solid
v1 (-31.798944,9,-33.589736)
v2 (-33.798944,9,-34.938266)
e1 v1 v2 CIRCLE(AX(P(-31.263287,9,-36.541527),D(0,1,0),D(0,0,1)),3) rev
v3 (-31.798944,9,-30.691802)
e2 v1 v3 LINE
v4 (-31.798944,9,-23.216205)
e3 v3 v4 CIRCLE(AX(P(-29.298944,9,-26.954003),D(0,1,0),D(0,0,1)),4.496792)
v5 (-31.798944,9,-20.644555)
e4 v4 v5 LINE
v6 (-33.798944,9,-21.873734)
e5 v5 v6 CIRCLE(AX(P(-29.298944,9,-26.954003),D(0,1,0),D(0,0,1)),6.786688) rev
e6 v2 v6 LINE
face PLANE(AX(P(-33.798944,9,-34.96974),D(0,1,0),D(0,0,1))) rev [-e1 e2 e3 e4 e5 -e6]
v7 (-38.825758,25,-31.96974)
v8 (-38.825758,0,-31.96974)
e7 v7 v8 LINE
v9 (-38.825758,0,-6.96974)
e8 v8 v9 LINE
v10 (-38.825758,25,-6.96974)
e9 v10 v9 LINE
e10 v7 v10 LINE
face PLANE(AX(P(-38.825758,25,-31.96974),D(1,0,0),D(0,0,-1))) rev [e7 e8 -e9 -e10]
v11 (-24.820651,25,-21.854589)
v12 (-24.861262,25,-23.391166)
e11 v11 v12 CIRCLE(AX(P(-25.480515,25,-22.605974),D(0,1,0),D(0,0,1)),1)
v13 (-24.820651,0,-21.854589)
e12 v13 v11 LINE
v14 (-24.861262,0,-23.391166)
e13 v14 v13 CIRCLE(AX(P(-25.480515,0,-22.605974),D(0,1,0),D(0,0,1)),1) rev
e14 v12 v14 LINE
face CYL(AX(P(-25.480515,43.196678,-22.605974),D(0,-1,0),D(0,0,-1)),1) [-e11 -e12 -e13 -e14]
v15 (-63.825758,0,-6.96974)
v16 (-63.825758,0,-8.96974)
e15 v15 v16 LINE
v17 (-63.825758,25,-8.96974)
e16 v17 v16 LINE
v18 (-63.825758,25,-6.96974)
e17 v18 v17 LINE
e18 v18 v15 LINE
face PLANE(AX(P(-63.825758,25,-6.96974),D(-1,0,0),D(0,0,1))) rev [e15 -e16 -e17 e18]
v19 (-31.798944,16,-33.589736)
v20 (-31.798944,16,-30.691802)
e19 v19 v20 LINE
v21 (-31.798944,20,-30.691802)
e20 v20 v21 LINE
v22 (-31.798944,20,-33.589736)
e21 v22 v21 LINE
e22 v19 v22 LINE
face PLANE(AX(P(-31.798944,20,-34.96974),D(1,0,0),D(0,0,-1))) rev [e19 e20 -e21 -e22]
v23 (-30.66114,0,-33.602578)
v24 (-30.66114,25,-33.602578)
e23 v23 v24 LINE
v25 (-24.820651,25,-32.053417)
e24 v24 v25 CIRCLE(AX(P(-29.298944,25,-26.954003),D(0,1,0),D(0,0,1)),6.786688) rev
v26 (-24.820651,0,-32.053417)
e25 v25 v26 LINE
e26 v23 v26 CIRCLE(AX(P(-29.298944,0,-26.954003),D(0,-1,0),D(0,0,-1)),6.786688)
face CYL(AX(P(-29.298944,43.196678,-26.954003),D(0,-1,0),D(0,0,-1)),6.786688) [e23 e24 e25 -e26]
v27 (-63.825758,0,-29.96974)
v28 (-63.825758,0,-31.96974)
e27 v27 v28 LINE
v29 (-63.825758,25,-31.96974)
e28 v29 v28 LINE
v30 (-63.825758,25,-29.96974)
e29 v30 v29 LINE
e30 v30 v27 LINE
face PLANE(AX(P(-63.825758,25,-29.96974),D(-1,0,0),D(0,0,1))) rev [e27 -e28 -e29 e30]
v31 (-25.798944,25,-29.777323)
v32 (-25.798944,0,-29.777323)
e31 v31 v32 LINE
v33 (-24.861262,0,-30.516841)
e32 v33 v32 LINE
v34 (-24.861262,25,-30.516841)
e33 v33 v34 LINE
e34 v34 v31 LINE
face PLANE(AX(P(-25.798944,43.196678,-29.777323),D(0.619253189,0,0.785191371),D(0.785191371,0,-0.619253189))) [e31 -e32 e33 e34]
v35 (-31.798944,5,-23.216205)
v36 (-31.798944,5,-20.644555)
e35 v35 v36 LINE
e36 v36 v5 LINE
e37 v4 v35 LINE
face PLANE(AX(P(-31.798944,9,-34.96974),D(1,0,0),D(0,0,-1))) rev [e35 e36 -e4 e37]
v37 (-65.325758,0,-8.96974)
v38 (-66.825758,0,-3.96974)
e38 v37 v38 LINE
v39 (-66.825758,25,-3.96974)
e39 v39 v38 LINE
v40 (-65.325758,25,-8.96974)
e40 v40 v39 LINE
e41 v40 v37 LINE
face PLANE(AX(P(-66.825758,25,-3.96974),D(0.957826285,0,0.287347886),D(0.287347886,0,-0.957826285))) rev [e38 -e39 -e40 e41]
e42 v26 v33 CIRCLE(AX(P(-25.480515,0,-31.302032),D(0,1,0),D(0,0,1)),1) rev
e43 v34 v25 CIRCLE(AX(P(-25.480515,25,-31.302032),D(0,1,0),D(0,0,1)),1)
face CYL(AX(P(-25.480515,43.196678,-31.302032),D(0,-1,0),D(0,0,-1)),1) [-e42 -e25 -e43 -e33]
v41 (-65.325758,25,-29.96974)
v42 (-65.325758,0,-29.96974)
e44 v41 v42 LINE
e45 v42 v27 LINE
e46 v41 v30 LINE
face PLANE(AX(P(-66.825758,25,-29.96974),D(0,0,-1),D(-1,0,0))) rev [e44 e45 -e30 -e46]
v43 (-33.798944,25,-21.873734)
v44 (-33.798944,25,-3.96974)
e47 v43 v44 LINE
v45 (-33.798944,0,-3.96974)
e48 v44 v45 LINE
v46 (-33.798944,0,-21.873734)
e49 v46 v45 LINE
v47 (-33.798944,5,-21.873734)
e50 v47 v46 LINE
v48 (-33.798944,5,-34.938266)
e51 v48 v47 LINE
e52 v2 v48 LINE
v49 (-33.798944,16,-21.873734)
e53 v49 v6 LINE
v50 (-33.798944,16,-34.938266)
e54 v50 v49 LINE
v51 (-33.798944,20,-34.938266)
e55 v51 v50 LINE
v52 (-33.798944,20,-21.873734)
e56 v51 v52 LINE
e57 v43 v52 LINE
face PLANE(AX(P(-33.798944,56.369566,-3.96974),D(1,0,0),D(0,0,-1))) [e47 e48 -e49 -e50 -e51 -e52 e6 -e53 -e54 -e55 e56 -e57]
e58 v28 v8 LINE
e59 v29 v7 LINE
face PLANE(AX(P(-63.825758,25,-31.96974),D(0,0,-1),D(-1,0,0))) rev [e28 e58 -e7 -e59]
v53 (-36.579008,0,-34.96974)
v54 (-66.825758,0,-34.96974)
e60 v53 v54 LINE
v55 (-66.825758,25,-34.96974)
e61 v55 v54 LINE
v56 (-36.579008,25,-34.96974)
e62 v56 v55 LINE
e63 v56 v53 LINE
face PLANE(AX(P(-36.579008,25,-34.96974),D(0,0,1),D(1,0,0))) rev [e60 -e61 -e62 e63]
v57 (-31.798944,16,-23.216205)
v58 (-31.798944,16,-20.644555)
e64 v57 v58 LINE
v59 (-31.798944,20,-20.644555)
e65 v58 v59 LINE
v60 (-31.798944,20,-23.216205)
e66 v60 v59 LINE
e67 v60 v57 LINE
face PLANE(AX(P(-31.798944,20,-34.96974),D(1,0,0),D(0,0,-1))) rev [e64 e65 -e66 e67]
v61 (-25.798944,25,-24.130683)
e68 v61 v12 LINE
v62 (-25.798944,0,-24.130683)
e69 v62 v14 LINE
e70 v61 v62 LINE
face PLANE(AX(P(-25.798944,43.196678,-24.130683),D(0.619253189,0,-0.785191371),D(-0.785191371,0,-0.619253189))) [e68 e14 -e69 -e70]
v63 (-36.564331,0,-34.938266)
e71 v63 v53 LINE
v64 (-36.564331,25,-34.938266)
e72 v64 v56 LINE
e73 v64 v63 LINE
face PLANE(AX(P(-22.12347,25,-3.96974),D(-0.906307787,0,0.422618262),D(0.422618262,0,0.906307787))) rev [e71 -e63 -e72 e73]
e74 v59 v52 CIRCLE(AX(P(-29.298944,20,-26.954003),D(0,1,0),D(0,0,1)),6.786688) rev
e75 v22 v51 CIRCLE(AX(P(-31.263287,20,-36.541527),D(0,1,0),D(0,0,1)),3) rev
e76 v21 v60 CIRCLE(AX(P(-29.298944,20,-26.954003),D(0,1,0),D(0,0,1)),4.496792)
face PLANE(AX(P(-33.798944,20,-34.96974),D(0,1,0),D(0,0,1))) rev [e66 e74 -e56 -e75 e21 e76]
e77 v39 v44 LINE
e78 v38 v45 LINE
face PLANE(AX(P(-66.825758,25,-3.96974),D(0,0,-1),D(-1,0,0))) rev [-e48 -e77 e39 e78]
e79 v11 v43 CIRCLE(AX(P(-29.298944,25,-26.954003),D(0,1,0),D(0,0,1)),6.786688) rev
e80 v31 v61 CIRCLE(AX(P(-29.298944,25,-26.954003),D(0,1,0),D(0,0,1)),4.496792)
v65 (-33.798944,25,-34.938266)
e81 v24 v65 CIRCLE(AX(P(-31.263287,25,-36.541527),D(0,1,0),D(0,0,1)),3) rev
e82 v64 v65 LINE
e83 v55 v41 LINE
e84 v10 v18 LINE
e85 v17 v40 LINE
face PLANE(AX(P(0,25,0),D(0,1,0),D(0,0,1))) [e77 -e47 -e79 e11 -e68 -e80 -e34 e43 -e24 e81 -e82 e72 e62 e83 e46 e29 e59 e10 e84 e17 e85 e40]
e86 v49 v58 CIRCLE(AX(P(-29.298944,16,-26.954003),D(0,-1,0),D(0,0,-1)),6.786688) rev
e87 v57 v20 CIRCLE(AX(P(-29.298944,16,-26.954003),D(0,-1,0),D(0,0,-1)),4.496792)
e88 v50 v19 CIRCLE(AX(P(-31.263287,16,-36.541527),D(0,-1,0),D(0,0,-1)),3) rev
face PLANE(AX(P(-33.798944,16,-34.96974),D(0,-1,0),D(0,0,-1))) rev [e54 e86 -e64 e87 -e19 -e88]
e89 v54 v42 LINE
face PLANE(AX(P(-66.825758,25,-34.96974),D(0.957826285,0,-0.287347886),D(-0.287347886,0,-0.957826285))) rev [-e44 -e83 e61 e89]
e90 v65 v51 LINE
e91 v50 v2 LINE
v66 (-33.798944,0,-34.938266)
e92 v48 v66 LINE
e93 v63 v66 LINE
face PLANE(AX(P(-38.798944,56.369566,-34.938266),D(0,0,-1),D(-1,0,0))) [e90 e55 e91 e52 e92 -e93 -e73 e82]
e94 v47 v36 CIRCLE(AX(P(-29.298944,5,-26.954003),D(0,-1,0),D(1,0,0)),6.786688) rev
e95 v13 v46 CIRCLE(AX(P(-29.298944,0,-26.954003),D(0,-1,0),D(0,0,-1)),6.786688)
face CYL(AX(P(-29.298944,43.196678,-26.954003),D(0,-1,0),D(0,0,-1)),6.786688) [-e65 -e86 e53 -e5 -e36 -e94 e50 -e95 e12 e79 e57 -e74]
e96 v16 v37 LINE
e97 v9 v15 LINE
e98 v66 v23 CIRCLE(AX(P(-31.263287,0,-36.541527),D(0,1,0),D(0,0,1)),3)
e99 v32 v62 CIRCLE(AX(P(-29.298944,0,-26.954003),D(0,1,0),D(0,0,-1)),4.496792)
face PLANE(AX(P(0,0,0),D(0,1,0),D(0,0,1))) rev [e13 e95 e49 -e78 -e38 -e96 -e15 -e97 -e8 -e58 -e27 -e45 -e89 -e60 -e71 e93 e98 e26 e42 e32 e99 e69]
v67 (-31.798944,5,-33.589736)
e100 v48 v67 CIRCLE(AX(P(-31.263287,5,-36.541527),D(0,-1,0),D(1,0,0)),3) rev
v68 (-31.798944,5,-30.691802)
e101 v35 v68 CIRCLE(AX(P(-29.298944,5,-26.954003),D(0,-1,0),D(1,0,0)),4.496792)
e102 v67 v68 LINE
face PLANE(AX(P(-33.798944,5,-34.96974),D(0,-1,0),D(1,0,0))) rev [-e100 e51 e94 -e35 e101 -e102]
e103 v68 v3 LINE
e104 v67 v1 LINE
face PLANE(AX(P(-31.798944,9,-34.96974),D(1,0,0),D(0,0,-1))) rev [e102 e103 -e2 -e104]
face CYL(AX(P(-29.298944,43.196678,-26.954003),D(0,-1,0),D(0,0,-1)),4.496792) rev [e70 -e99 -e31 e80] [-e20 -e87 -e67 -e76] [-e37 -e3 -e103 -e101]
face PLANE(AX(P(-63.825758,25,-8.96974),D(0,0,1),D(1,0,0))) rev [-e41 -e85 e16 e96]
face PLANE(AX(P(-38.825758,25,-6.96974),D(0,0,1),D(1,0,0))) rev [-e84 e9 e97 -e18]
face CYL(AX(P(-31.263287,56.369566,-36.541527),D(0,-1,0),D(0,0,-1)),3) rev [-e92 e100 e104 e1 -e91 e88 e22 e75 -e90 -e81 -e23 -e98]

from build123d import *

# Parameters (mm, degrees)
EXTRUDE_1_DEPTH      = 25
CUT_EXTRUDE_4_DEPTH  = 80.457942189
SKETCH_7_W           = 16.60831278
SKETCH_7_H           = 38.473598513
CUT_EXTRUDE_14_DEPTH = 80.457942189
SKETCH_8_W           = 5
SKETCH_8_H           = 30.968526609
EXTRUDE_2_DEPTH      = 25
EXTRUDE_3_DEPTH      = 25
FILLET_2_R           = 3
FILLET_4_R           = 1
SKETCH_10_W          = 2
SKETCH_10_H          = 4
CUT_EXTRUDE_15_DEPTH = 78.792556685
SKETCH_11_W          = 10.357145721
SKETCH_11_H          = 16.019748685
CUT_EXTRUDE_16_DEPTH = 80.457942189


with BuildPart() as part:
    # Эскиз1 → Бобышка-Вытянуть1 (new body)
    with BuildSketch(Plane(origin=(0, 0, 0), x_dir=(1, 0, 0), z_dir=(0, 1, 0))):
        Polygon((-66.825757576, 34.969739794), (-66.825757576, 29.969739794), (-63.825757576, 29.969739794), (-63.825757576, 31.969739794), (-38.825757576, 31.969739794), (-38.825757576, 6.969739794), (-63.825757576, 6.969739794), (-63.825757576, 8.969739794), (-66.825757576, 8.969739794), (-66.825757576, 3.969739794), (-22.123470102, 3.969739794), (-36.579007505, 34.969739794), align=None)
    extrude(amount=EXTRUDE_1_DEPTH)

    # Эскиз3 → Вырез-Вытянуть4 (cut, through all)
    with BuildSketch(Plane.XZ):
        Polygon((-66.825757576, -3.969739794), (-65.325757576, -8.969739794), (-66.825757576, -8.969739794), align=None)
        Polygon((-66.825757576, -29.969739794), (-66.825757576, -34.969739794), (-65.325757576, -29.969739794), align=None)
    extrude(amount=-CUT_EXTRUDE_4_DEPTH, mode=Mode.SUBTRACT)

    # Эскиз7 → Вырез-Вытянуть14 (cut, through all)
    with BuildSketch(Plane(origin=(0, 0, 0), x_dir=(-1, 0, 0), z_dir=(0, -1, 0))):
        with Locations((27.703474463, 20.539743139)):
            Rectangle(SKETCH_7_W, SKETCH_7_H)
    extrude(amount=-CUT_EXTRUDE_14_DEPTH, mode=Mode.SUBTRACT)

    # Эскиз8 → Бобышка-Вытянуть2 (add)
    with BuildSketch(Plane(origin=(0, 0, 0), x_dir=(-1, 0, 0), z_dir=(0, -1, 0))):
        with Locations((36.298943925, 19.454003098)):
            Rectangle(SKETCH_8_W, SKETCH_8_H)
    extrude(amount=-EXTRUDE_2_DEPTH)

    # Эскиз9 → Бобышка-Вытянуть3 (add)
    with BuildSketch(Plane.XZ):
        with BuildLine():
            Line((-25.798943925, -9.121669553), (-24.000865345, -7.695483003))
            ThreePointArc((-24.000865345, -7.695483003), (-36.096342696, -11.954003099), (-24.000865345, -16.212523195))
            Line((-24.000865345, -16.212523195), (-25.798943925, -14.786336644))
            ThreePointArc((-25.798943925, -14.786336644), (-33.80140029, -11.954003099), (-25.798943925, -9.121669553))
        make_face()
        with BuildLine():
            Line((-25.798943925, -24.130682885), (-24.000865345, -22.7126007))
            ThreePointArc((-24.000865345, -22.7126007), (-36.0856317, -26.954003099), (-24.000865345, -31.195405497))
            Line((-24.000865345, -31.195405497), (-25.798943925, -29.777323313))
            ThreePointArc((-25.798943925, -29.777323313), (-33.795735785, -26.954003099), (-25.798943925, -24.130682885))
        make_face()
    extrude(amount=-EXTRUDE_3_DEPTH)

    # Скругление2
    # the kernel refuses this fillet: 3 mm, written as the material it adds along each edge
    with BuildSketch(Plane(origin=(-33.798943925, 25, -6.859434417), x_dir=(0, 0, 1), z_dir=(0, -1, 0))) as fillet_2_piece_1:
        with BuildLine():
            CenterArc((4.502629254, -2.529514158), FILLET_2_R, 122.523458888, 69.079199353)
            Line((1.563931496, -3.132884263), (1.505157541, -3.144951665))
            ThreePointArc((1.505157541, -3.144951665), (0.933475042, -1.490808901), (-0.044969279, -0.039721077))
            Line((-0.044969279, -0.039721077), (0, 0.06))
            ThreePointArc((0, 0.06), (1.444847312, 0.06), (2.85743593, 0.050590283))
            Line((2.85743593, 0.050590283), (2.889694623, 0))
        make_face()
    extrude(amount=25)
    with BuildSketch(Plane(origin=(-33.798943925, 25, -32.034271886), x_dir=(0, 0, -1), z_dir=(0, -1, 0))) as fillet_2_piece_2:
        with BuildLine():
            CenterArc((4.507255062, 2.535656843), FILLET_2_R, 168.421178081, 69.274223823)
            Line((1.568306542, 3.137804332), (1.509527572, 3.149847282))
            ThreePointArc((1.509527572, 3.149847282), (0.936720457, 1.492647534), (-0.044913828, 0.039783766))
            Line((-0.044913828, 0.039783766), (0, -0.06))
            ThreePointArc((0, -0.06), (1.451997259, -0.06), (2.871929307, -0.050713137))
            Line((2.871929307, -0.050713137), (2.903994517, 0))
        make_face()
    extrude(amount=25)

    # Скругление4
    fillet_4_edges = [part.edges().sort_by_distance(p)[0] for p in [
        (-24.000865345, 12.5, -7.695483003),
        (-24.000865345, 12.5, -16.212523195),
        (-24.000865345, 12.5, -22.7126007),
        (-24.000865345, 12.5, -31.195405497),
    ]]
    fillet(fillet_4_edges, radius=FILLET_4_R)

    # Эскиз10 → Вырез-Вытянуть15 (cut, through all)
    with BuildSketch(Plane.XY.offset(-3.969739794)):
        with Locations((-32.798943925, 18)):
            Rectangle(SKETCH_10_W, SKETCH_10_H)
        with Locations((-32.798943925, 7)):
            Rectangle(SKETCH_10_W, SKETCH_10_H)
    extrude(amount=-CUT_EXTRUDE_15_DEPTH, mode=Mode.SUBTRACT)

    # Эскиз11 → Вырез-Вытянуть16 (cut, through all)
    with BuildSketch(Plane.XZ):
        with Locations((-28.620371065, -11.979614137)):
            Rectangle(SKETCH_11_W, SKETCH_11_H)
    extrude(amount=-CUT_EXTRUDE_16_DEPTH, mode=Mode.SUBTRACT)


solid = part.part
